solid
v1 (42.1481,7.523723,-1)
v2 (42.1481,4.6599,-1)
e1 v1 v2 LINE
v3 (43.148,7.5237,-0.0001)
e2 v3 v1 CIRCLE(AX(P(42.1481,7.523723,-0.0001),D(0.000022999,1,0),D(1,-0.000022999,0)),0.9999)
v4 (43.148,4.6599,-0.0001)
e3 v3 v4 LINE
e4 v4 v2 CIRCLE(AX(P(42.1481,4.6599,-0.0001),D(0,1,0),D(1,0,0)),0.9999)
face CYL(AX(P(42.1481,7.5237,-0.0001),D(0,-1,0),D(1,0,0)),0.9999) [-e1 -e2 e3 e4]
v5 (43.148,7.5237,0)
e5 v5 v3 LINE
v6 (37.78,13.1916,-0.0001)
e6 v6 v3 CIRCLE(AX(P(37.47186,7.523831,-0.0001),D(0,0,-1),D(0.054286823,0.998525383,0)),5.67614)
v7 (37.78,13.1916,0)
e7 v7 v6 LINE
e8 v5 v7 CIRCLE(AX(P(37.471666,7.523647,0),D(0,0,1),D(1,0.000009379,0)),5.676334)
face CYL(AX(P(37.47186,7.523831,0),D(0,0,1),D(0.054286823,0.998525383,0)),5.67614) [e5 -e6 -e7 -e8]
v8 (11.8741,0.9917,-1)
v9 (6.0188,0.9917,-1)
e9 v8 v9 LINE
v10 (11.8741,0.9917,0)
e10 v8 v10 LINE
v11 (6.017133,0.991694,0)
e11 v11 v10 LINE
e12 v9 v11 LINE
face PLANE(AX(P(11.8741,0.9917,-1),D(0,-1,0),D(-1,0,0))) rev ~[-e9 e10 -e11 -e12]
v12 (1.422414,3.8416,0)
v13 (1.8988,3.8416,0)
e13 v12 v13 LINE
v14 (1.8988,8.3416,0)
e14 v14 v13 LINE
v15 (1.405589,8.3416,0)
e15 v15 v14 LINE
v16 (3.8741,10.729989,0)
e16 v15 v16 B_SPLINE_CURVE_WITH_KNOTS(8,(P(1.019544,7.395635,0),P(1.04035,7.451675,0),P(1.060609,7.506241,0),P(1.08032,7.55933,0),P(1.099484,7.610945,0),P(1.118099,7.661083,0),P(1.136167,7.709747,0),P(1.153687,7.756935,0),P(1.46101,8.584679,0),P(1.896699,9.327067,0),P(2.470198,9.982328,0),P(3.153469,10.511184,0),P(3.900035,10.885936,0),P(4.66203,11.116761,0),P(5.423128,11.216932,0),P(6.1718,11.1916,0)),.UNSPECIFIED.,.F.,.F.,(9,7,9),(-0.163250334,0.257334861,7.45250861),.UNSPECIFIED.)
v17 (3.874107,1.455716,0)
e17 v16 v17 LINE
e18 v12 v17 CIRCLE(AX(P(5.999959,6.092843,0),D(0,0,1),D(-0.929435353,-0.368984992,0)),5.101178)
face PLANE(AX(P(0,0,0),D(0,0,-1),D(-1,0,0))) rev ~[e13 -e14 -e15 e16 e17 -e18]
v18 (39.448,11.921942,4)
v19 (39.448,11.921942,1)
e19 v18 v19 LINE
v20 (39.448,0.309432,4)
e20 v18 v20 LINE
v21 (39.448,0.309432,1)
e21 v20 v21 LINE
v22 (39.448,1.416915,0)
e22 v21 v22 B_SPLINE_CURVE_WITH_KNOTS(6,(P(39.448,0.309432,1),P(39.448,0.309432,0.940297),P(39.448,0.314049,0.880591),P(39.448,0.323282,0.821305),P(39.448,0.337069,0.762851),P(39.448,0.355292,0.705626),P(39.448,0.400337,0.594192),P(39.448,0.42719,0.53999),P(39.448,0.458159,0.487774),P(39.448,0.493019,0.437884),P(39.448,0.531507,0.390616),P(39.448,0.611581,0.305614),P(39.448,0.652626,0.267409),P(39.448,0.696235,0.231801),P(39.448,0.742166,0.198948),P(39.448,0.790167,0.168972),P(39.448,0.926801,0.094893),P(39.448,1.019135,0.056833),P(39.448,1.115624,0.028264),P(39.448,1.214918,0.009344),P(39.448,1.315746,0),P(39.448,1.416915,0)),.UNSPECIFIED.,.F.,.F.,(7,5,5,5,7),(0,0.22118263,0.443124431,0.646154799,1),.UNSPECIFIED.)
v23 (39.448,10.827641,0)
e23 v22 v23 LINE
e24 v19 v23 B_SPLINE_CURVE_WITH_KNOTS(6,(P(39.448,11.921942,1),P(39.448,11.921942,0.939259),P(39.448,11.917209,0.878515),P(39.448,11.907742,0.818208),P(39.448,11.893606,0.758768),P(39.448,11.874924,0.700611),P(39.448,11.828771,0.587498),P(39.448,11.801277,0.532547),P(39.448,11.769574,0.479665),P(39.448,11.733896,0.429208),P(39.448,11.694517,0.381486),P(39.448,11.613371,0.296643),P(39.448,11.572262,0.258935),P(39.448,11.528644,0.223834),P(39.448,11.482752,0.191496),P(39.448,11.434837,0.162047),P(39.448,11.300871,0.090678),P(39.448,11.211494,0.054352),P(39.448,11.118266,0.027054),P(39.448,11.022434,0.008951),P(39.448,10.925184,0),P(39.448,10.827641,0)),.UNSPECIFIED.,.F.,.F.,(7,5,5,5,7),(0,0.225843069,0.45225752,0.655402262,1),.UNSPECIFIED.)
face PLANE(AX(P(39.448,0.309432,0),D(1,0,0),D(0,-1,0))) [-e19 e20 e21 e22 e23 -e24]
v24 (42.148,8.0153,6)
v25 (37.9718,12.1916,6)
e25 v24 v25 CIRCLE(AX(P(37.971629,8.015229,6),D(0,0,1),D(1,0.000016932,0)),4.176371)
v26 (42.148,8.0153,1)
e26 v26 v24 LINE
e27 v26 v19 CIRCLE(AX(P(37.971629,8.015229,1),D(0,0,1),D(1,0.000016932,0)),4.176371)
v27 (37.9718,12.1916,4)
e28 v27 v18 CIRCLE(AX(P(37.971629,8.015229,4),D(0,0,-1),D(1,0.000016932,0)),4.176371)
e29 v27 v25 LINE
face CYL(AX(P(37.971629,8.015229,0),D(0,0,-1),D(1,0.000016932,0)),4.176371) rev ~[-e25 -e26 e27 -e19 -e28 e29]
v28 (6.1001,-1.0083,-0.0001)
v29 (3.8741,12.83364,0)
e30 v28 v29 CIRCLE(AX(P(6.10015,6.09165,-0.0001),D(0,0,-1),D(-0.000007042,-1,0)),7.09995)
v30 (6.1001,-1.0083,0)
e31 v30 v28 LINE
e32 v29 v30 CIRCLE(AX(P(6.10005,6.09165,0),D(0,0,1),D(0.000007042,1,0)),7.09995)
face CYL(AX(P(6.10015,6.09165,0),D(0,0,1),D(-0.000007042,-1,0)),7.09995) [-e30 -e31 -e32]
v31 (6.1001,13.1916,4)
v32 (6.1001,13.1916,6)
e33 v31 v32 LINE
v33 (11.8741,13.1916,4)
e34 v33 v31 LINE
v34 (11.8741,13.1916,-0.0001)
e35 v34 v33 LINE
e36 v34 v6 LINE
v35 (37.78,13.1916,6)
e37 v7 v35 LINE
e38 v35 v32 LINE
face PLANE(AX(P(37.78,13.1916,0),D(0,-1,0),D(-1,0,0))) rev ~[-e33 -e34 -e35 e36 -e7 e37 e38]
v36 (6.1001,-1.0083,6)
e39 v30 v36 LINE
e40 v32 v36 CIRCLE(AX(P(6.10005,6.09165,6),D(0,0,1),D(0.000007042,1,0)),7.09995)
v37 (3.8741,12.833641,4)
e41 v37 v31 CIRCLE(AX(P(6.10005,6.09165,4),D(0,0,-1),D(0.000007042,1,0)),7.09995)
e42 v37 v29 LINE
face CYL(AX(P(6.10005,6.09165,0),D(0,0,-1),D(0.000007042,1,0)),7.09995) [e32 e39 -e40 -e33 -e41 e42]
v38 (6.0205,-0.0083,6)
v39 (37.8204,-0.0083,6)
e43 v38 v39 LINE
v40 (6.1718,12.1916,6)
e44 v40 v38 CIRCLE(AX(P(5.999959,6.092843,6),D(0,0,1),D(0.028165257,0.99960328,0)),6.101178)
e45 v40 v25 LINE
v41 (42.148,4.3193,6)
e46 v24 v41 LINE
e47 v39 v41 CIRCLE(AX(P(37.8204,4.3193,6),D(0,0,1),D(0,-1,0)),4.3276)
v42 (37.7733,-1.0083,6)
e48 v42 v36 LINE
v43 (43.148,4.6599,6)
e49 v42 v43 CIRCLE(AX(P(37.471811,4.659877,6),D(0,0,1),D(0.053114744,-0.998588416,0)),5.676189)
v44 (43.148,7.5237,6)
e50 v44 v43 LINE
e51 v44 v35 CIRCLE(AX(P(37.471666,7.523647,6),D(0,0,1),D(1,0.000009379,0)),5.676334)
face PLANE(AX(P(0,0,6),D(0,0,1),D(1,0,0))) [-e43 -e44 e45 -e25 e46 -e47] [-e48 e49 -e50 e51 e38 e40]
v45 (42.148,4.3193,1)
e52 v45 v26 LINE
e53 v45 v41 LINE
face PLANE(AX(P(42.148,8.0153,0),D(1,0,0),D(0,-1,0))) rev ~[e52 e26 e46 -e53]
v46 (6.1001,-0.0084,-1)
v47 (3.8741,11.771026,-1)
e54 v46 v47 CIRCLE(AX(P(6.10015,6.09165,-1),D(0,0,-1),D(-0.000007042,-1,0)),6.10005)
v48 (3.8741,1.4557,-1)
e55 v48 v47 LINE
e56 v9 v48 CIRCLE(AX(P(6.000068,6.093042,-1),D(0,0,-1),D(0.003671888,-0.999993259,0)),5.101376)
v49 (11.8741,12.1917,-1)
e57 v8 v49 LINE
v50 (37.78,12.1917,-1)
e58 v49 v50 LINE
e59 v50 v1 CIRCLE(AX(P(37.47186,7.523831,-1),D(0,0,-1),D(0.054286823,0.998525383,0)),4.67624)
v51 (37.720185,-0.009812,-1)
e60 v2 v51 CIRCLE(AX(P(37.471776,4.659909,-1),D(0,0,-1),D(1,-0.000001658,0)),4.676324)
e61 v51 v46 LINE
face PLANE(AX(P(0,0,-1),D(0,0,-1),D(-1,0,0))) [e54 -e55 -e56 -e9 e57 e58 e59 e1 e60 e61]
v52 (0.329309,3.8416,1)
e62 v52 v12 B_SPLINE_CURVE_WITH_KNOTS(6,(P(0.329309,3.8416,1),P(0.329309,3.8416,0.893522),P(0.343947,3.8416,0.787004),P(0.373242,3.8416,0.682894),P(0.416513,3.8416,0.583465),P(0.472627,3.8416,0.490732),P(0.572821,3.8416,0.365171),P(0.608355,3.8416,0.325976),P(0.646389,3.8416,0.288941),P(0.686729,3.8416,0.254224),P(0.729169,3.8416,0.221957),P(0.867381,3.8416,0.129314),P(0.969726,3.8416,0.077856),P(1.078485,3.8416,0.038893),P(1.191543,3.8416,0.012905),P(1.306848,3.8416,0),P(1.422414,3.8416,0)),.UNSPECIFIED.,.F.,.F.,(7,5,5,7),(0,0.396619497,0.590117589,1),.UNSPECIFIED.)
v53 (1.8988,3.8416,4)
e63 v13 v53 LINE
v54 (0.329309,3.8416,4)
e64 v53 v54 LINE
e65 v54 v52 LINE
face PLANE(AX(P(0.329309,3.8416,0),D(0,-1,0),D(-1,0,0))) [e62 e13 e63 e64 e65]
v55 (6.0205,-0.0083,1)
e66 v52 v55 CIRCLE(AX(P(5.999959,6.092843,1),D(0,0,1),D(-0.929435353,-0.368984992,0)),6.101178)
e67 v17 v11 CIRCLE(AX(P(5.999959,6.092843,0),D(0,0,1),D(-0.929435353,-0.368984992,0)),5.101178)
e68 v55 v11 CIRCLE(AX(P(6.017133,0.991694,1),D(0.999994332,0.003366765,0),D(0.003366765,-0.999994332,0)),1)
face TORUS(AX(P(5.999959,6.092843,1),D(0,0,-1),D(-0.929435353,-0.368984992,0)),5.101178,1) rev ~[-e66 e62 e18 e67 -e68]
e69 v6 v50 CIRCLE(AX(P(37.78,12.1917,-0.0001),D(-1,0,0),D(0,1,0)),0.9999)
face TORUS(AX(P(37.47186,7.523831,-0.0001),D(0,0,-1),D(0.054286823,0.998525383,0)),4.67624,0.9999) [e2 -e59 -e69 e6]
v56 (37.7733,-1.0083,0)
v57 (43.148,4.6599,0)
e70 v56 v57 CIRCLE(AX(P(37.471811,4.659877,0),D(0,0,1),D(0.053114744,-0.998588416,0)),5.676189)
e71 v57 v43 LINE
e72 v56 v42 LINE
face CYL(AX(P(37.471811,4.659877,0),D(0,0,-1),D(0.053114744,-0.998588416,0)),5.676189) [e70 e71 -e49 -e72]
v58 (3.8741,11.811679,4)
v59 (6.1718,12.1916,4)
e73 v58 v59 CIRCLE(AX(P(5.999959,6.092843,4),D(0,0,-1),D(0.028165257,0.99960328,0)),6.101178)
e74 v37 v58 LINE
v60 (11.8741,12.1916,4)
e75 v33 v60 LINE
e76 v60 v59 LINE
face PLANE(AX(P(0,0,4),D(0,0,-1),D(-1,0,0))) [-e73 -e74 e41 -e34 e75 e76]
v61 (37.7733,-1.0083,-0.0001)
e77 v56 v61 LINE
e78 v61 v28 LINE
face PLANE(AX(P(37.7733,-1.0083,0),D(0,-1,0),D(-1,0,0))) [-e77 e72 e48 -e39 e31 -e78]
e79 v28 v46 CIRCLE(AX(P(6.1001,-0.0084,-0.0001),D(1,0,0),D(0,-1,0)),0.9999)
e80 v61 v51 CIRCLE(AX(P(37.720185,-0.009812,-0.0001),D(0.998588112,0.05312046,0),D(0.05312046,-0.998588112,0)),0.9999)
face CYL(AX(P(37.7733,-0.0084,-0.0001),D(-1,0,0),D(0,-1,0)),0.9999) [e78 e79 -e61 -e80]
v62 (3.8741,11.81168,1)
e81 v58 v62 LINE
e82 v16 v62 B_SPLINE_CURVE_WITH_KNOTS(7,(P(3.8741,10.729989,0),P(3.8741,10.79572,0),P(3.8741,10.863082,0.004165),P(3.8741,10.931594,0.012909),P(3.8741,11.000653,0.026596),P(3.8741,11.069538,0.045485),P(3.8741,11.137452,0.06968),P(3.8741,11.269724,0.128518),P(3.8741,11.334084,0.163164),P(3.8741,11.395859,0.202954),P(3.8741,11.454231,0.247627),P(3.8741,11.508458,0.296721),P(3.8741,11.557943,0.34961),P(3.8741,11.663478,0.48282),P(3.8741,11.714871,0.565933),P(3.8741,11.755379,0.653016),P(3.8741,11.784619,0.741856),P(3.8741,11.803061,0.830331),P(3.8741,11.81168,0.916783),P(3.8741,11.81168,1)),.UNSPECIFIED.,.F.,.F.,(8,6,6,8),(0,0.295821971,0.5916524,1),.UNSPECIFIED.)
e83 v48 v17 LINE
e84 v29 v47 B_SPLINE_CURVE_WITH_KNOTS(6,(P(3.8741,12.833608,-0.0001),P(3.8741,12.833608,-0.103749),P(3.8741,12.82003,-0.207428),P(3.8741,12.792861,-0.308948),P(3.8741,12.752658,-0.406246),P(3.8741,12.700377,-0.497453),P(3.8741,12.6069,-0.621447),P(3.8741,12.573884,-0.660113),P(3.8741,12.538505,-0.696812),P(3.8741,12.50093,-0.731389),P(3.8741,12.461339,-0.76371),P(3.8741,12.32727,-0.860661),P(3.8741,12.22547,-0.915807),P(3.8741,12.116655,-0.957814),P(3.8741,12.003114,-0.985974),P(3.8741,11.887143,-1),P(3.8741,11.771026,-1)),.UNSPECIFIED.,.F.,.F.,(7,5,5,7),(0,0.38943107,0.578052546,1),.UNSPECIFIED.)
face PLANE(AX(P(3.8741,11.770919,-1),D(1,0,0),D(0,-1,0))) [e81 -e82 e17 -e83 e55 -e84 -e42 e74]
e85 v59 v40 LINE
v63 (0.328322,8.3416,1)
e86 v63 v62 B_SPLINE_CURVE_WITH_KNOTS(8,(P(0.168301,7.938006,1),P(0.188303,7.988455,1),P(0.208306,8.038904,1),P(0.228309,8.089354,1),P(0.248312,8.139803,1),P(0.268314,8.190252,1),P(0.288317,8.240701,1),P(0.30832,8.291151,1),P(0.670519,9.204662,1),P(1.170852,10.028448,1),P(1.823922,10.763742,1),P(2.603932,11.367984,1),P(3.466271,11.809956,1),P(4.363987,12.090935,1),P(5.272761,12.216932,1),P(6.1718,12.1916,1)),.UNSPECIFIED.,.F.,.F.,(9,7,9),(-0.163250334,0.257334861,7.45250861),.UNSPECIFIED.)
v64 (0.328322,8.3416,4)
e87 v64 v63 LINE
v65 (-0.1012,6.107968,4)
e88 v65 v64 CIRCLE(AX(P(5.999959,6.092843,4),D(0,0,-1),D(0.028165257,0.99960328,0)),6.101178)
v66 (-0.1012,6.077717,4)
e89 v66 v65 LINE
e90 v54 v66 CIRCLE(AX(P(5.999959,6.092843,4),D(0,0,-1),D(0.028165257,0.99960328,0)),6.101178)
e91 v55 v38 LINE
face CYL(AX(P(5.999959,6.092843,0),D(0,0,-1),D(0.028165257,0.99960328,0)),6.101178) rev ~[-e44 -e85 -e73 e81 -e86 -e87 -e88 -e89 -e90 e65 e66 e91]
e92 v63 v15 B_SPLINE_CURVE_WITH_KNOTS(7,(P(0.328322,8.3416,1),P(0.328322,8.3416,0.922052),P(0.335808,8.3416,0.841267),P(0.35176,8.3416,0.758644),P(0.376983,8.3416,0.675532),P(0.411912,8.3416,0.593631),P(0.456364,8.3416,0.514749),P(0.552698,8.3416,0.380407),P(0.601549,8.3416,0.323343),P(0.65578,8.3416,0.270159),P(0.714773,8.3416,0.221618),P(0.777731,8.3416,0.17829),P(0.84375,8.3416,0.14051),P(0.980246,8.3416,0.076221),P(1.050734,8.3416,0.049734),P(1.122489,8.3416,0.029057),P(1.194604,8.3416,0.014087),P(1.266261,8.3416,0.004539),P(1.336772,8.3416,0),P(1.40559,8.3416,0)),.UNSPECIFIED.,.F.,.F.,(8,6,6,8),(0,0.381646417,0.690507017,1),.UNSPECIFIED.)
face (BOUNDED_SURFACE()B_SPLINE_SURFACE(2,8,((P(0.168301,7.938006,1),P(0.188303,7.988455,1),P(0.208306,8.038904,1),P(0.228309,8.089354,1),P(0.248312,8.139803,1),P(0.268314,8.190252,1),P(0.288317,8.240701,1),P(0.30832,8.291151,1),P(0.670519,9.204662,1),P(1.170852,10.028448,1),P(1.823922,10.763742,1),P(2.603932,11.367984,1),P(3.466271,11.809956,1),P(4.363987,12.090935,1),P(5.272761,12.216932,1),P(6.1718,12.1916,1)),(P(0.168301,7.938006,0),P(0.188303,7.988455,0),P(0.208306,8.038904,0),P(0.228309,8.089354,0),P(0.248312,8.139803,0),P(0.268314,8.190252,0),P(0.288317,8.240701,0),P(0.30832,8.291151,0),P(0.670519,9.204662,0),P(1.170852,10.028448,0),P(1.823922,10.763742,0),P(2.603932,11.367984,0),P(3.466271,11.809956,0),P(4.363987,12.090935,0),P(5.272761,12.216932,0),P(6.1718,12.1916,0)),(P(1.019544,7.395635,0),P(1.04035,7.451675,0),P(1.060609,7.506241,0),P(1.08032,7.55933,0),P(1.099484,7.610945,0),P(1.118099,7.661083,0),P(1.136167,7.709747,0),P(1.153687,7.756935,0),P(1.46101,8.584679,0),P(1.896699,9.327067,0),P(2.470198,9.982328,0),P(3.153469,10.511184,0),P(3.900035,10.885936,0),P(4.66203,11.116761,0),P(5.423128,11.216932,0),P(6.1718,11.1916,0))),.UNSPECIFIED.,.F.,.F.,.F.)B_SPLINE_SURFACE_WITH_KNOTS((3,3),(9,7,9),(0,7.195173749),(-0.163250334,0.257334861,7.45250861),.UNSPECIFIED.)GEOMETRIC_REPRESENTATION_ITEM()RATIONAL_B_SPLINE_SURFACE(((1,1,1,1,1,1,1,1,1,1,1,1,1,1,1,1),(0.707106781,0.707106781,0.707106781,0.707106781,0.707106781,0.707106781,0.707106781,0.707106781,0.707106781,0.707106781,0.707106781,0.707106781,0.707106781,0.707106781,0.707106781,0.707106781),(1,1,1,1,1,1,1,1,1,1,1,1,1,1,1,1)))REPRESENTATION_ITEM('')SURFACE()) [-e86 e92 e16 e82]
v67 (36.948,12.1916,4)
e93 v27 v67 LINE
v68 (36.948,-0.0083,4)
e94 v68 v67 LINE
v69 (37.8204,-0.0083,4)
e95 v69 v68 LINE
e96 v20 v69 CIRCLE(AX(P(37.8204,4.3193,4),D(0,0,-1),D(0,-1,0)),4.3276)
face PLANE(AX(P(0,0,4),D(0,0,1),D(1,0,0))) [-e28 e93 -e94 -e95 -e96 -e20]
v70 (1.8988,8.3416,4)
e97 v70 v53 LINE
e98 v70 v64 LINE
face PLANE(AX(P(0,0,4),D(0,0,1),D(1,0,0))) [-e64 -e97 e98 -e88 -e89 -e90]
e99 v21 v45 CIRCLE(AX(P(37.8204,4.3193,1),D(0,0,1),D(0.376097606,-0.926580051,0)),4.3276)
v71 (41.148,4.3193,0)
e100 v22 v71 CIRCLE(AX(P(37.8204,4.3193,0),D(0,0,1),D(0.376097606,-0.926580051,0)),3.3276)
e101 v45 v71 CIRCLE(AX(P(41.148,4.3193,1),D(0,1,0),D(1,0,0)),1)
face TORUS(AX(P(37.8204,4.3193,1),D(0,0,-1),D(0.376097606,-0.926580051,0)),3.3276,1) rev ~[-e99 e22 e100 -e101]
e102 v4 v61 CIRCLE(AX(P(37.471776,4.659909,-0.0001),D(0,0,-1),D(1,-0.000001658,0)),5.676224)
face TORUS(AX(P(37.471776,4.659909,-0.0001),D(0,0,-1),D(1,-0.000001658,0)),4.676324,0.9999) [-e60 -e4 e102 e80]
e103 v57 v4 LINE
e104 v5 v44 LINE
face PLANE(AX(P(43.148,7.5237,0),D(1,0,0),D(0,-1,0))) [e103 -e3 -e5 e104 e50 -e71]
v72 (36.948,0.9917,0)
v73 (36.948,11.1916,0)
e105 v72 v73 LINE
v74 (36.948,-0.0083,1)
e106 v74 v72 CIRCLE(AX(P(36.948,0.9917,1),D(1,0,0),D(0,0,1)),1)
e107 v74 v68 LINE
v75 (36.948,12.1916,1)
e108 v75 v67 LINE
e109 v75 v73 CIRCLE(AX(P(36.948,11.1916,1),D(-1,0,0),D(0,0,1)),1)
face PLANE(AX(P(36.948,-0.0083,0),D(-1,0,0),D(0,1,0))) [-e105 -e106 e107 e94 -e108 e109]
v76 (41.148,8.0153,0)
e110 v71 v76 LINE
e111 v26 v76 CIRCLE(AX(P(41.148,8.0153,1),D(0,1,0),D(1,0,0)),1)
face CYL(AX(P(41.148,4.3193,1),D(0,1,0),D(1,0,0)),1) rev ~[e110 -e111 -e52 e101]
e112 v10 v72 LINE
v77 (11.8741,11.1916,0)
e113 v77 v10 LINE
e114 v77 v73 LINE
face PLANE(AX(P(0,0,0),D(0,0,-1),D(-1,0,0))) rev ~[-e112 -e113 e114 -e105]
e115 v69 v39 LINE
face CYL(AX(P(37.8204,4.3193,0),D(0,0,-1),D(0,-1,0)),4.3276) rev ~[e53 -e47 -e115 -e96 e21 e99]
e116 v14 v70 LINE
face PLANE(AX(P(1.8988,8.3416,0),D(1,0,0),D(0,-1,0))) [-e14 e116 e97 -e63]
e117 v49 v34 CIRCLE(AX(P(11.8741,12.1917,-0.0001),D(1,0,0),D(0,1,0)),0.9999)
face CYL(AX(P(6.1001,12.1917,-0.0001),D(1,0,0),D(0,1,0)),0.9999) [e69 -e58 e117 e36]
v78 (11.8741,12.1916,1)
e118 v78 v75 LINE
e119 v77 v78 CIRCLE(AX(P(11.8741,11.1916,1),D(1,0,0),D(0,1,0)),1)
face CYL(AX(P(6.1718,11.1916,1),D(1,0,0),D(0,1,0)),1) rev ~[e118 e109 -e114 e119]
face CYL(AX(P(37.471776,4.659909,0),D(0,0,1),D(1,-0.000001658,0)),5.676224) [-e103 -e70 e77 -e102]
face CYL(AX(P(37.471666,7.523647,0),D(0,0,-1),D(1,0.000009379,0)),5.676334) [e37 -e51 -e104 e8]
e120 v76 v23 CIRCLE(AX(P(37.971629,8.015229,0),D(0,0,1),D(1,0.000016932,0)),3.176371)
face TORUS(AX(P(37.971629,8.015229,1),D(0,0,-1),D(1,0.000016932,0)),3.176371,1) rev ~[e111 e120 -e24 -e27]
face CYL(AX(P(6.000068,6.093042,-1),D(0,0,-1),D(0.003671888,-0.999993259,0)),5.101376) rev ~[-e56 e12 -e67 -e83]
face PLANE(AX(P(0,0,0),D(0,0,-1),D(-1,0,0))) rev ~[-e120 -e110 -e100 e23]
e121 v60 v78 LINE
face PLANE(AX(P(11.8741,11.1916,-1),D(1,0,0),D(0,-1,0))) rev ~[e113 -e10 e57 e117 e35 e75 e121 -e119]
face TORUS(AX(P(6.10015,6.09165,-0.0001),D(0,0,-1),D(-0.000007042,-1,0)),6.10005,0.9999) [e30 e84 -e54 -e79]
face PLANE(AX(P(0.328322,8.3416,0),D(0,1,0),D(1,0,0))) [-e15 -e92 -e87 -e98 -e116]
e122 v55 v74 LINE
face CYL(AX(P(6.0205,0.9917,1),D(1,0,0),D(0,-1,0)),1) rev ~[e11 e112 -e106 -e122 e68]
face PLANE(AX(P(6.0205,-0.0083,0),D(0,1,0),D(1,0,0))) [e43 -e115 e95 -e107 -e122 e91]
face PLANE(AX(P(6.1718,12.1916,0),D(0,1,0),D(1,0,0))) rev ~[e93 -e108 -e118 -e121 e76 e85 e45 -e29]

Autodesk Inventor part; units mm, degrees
ref_plane "YZ Plane" through (0, 0, 0) normal (1, 0, 0) x (0, 1, 0)
ref_plane "XZ Plane" through (0, 0, 0) normal (0, 1, 0) x (-1, 0, 0)
ref_plane "XY Plane" through (0, 0, 0) normal (0, 0, 1) x (1, 0, 0)
sketch "Эскиз1" plane through (0, 0, 0) normal (0, 0, 1) x (1, 0, 0)
  arc A0 (6.1718, 12.1916) -> (6.0205, -0.0083) centre (6, 6.0928) ccw
  line L0 (6.1718, 12.1916) -> (6.0205, -0.0083) construction
  line L1 (6.1718, 12.1916) -> (18.3727, 12.1916) construction
  arc A1 (42.148, 8.0153) -> (37.9718, 12.1916) centre (37.9718, 8.0153) ccw
  arc A2 (37.8204, -0.0083) -> (42.148, 4.3193) centre (37.8204, 4.3193) ccw
  arc A3 (6.1001, 13.1916) -> (6.1001, -1.0083) centre (6.1001, 6.0916) ccw
  arc A4 (43.148, 7.5237) -> (37.78, 13.1916) centre (37.4718, 7.5237) ccw
  arc A5 (37.7733, -1.0083) -> (43.148, 4.6599) centre (37.4718, 4.6599) ccw
  line L2 (6.1718, 12.1916) -> (37.9718, 12.1916)
  line L3 (37.78, 13.1916) -> (6.1001, 13.1916)
  line L4 (6.0205, -0.0083) -> (37.8204, -0.0083)
  line L5 (37.7733, -1.0083) -> (6.1001, -1.0083)
  line L6 (42.148, 8.0153) -> (42.148, 4.3193)
  line L7 (43.148, 7.5237) -> (43.148, 4.6599)
  point P0 (0, 0)
  point P1 (0, 0)
  dimension "d7" = 1.5
  dimension "d0" = 90.71
  dimension "d1" = 4.1763
  dimension "d2" = 5.6763
  dimension "d3" = 5.6763
  dimension "d4" = 1
  dimension "d5" = 1
  dimension "d8" = 12.1999
  dimension "d9" = 31.8
  dimension "d10" = 31.7998
  dimension "d13" = 1
extrude "main_walls" add sketch "Эскиз1" along normal blind 6
sketch "Эскиз2" plane through (0, 0, 0) normal (0, 0, -1) x (-1, 0, 0)
  line L0 (-37.7733, -1.0083) -> (-6.1001, -1.0083) projected
  arc A0 (-6.1001, -1.0083) -> (-6.1001, 13.1916) centre (-6.1001, 6.0916) ccw projected
  line L1 (-6.1001, 13.1916) -> (-37.78, 13.1916) projected
  arc A1 (-37.78, 13.1916) -> (-43.148, 7.5237) centre (-37.4718, 7.5237) ccw projected
  line L2 (-43.148, 7.5237) -> (-43.148, 4.6599) projected
  arc A2 (-43.148, 4.6599) -> (-37.7733, -1.0083) centre (-37.4718, 4.6599) ccw projected
  point P0 (0, 0)
extrude "floor" add sketch "Эскиз2" along normal blind 1
sketch "Эскиз3" plane through (0, 0, 0) normal (0, 0, 1) x (1, 0, 0)
  line L0 (42.148, 4.3193) -> (42.148, 8.0153) projected
  arc A0 (42.148, 8.0153) -> (37.9718, 12.1916) centre (37.9718, 8.0153) ccw projected
  line L1 (37.9718, 12.1916) -> (6.1718, 12.1916) projected
  arc A1 (6.1718, 12.1916) -> (6.0205, -0.0083) centre (6, 6.0928) ccw projected
  line L2 (6.0205, -0.0083) -> (37.8204, -0.0083) projected
  arc A2 (37.8204, -0.0083) -> (42.148, 4.3193) centre (37.8204, 4.3193) ccw projected
  line L3 (-0.1012, 8.3416) -> (1.8988, 8.3416)
  line L4 (1.8988, 8.3416) -> (1.8988, 3.8416)
  line L5 (1.8988, 3.8416) -> (-0.1012, 3.8416)
  line L6 (-0.1012, 3.8416) -> (-0.1012, 8.3416)
  arc A3 (6.1718, 12.1916) -> (6.0205, -0.0083) centre (6, 6.0928) ccw projected
  arc A4 (42.148, 8.0153) -> (37.9718, 12.1916) centre (37.9718, 8.0153) ccw projected
  line L7 (6.1718, 12.1916) -> (37.9718, 12.1916) projected
  arc A5 (37.8204, -0.0083) -> (42.148, 4.3193) centre (37.8204, 4.3193) ccw projected
  line L8 (6.0205, -0.0083) -> (37.8204, -0.0083) projected
  line L9 (36.948, 12.1916) -> (39.448, 12.1916)
  line L10 (39.448, 12.1916) -> (39.448, -0.0083)
  line L11 (39.448, -0.0083) -> (36.948, -0.0083)
  line L12 (36.948, -0.0083) -> (36.948, 12.1916)
  point P0 (0, 0)
  dimension "d16" = 2
  dimension "d17" = 4.5
  dimension "d18" = 12.1999
  dimension "d19" = 3.85
  dimension "d22" = 2.7
  dimension "d23" = 2.5
extrude "supports" add sketch "Эскиз3" along normal blind 4 contours L10 L11 A2 | A2 L2 L12 L1 A0 L10 | A0 L9 L10 | L5 L6 A1 | A1 L3 L4 L5 | A1 L6 L3
fillet "bottom_rounding" radius 1 13 edges at (21.5599, 12.1916, 0) (21.4843, -0.0083, 0) (2.5814, 1.0393, 0) (2.6433, 11.1876, 0) (42.148, 6.1673, 0) (41.4101, 1.9022, 0) (41.4073, 10.3898, 0) (-0.9999, 6.0916, -1) (21.94, 13.1916, -1) (21.9367, -1.0083, -1) (43.148, 6.0918, -1) (41.593, 11.4269, -1) (41.5907, 0.7543, -1)
sketch "Эскиз5" plane through (0, 0, 0) normal (0, 0, 1) x (1, 0, 0)
  arc A0 (1.4224, 3.8416) -> (6.0188, 0.9917) centre (6, 6.0928) ccw projected
  line L0 (36.948, 0.9917) -> (6.0188, 0.9917) projected
  line L1 (36.948, 0.9917) -> (36.948, 11.1916) projected
  line L2 (6.1571, 11.1916) -> (36.948, 11.1916) projected
  arc A1 (6.1571, 11.1916) -> (1.4212, 8.3416) centre (6, 6.0928) ccw projected
  line L3 (1.4212, 8.3416) -> (1.8988, 8.3416) projected
  line L4 (1.8988, 8.3416) -> (1.8988, 3.8416) projected
  line L5 (1.8988, 3.8416) -> (1.4224, 3.8416) projected
  line L6 (9.8988, 0.9917) -> (9.8988, 11.1916)
  point P0 (0, 0)
  dimension "d27" = 8
sketch "Эскиз6" plane through (0, 0, -1) normal (0, 0, -1) x (-1, 0, 0)
  line L0 (-1.8988, 8.3416) -> (-1.8988, 3.8416) projected
  line L1 (-1.4212, 8.3416) -> (-1.8988, 8.3416) projected
  arc A0 (-1.4212, 8.3416) -> (-6.1571, 11.1916) centre (-6, 6.0928) ccw projected
  line L2 (-1.8988, 3.8416) -> (-1.4224, 3.8416) projected
  arc A1 (-6.0188, 0.9917) -> (-1.4224, 3.8416) centre (-6, 6.0928) ccw projected
  line L3 (-6.1001, -0.0083) -> (-37.7455, -0.0083) projected
  arc A2 (-6.1001, -0.0083) -> (-6.1001, 12.1916) centre (-6.1001, 6.0916) ccw projected
  line L4 (-37.7515, 12.1916) -> (-6.1001, 12.1916) projected
  arc A3 (-37.7515, 12.1916) -> (-42.148, 7.5237) centre (-37.4718, 7.5237) ccw projected
  line L5 (-42.148, 4.6599) -> (-42.148, 7.5237) projected
  arc A4 (-42.148, 4.6599) -> (-37.7455, -0.0083) centre (-37.4718, 4.6599) ccw projected
  line L6 (-6.1571, 11.1916) -> (-36.948, 11.1916) projected
  line L7 (-36.948, 0.9917) -> (-6.0188, 0.9917) projected
  line L8 (-11.8741, 11.1916) -> (-11.8741, 0.9917)
  line L9 (-3.8741, 10.7299) -> (-3.8741, 1.4557)
  line L10 (-6.1001, 13.1916) -> (-37.78, 13.1916) projected
  line L11 (-3.8741, 10.7299) -> (-11.8741, 10.7299)
  line L12 (-11.8741, 10.7299) -> (-11.8741, 13.1916)
  line L13 (-11.8741, 13.1916) -> (-3.8741, 13.1916)
  line L14 (-3.8741, 13.1916) -> (-3.8741, 10.7299)
  point P0 (0, 0)
  dimension "d31" = 8
extrude "Выдавливание5" cut sketch "Эскиз6" against normal blind 5 contours L11 L8 L6 A0 | L9 A1 L7 L8 L11 | A0 L6 L12 L4 A2 L14 | A2 L4 L12 L10 L13 L14
equation "\"d2\" = d1 + d7"
equation "\"d3\" = d1 + d7"
equation "\"d5\" = d4"
equation "\"d13\" = d4"
equation "\"d19\" = -0.5 * d17 + 0.5 * d18"
properties part number "bottom"
